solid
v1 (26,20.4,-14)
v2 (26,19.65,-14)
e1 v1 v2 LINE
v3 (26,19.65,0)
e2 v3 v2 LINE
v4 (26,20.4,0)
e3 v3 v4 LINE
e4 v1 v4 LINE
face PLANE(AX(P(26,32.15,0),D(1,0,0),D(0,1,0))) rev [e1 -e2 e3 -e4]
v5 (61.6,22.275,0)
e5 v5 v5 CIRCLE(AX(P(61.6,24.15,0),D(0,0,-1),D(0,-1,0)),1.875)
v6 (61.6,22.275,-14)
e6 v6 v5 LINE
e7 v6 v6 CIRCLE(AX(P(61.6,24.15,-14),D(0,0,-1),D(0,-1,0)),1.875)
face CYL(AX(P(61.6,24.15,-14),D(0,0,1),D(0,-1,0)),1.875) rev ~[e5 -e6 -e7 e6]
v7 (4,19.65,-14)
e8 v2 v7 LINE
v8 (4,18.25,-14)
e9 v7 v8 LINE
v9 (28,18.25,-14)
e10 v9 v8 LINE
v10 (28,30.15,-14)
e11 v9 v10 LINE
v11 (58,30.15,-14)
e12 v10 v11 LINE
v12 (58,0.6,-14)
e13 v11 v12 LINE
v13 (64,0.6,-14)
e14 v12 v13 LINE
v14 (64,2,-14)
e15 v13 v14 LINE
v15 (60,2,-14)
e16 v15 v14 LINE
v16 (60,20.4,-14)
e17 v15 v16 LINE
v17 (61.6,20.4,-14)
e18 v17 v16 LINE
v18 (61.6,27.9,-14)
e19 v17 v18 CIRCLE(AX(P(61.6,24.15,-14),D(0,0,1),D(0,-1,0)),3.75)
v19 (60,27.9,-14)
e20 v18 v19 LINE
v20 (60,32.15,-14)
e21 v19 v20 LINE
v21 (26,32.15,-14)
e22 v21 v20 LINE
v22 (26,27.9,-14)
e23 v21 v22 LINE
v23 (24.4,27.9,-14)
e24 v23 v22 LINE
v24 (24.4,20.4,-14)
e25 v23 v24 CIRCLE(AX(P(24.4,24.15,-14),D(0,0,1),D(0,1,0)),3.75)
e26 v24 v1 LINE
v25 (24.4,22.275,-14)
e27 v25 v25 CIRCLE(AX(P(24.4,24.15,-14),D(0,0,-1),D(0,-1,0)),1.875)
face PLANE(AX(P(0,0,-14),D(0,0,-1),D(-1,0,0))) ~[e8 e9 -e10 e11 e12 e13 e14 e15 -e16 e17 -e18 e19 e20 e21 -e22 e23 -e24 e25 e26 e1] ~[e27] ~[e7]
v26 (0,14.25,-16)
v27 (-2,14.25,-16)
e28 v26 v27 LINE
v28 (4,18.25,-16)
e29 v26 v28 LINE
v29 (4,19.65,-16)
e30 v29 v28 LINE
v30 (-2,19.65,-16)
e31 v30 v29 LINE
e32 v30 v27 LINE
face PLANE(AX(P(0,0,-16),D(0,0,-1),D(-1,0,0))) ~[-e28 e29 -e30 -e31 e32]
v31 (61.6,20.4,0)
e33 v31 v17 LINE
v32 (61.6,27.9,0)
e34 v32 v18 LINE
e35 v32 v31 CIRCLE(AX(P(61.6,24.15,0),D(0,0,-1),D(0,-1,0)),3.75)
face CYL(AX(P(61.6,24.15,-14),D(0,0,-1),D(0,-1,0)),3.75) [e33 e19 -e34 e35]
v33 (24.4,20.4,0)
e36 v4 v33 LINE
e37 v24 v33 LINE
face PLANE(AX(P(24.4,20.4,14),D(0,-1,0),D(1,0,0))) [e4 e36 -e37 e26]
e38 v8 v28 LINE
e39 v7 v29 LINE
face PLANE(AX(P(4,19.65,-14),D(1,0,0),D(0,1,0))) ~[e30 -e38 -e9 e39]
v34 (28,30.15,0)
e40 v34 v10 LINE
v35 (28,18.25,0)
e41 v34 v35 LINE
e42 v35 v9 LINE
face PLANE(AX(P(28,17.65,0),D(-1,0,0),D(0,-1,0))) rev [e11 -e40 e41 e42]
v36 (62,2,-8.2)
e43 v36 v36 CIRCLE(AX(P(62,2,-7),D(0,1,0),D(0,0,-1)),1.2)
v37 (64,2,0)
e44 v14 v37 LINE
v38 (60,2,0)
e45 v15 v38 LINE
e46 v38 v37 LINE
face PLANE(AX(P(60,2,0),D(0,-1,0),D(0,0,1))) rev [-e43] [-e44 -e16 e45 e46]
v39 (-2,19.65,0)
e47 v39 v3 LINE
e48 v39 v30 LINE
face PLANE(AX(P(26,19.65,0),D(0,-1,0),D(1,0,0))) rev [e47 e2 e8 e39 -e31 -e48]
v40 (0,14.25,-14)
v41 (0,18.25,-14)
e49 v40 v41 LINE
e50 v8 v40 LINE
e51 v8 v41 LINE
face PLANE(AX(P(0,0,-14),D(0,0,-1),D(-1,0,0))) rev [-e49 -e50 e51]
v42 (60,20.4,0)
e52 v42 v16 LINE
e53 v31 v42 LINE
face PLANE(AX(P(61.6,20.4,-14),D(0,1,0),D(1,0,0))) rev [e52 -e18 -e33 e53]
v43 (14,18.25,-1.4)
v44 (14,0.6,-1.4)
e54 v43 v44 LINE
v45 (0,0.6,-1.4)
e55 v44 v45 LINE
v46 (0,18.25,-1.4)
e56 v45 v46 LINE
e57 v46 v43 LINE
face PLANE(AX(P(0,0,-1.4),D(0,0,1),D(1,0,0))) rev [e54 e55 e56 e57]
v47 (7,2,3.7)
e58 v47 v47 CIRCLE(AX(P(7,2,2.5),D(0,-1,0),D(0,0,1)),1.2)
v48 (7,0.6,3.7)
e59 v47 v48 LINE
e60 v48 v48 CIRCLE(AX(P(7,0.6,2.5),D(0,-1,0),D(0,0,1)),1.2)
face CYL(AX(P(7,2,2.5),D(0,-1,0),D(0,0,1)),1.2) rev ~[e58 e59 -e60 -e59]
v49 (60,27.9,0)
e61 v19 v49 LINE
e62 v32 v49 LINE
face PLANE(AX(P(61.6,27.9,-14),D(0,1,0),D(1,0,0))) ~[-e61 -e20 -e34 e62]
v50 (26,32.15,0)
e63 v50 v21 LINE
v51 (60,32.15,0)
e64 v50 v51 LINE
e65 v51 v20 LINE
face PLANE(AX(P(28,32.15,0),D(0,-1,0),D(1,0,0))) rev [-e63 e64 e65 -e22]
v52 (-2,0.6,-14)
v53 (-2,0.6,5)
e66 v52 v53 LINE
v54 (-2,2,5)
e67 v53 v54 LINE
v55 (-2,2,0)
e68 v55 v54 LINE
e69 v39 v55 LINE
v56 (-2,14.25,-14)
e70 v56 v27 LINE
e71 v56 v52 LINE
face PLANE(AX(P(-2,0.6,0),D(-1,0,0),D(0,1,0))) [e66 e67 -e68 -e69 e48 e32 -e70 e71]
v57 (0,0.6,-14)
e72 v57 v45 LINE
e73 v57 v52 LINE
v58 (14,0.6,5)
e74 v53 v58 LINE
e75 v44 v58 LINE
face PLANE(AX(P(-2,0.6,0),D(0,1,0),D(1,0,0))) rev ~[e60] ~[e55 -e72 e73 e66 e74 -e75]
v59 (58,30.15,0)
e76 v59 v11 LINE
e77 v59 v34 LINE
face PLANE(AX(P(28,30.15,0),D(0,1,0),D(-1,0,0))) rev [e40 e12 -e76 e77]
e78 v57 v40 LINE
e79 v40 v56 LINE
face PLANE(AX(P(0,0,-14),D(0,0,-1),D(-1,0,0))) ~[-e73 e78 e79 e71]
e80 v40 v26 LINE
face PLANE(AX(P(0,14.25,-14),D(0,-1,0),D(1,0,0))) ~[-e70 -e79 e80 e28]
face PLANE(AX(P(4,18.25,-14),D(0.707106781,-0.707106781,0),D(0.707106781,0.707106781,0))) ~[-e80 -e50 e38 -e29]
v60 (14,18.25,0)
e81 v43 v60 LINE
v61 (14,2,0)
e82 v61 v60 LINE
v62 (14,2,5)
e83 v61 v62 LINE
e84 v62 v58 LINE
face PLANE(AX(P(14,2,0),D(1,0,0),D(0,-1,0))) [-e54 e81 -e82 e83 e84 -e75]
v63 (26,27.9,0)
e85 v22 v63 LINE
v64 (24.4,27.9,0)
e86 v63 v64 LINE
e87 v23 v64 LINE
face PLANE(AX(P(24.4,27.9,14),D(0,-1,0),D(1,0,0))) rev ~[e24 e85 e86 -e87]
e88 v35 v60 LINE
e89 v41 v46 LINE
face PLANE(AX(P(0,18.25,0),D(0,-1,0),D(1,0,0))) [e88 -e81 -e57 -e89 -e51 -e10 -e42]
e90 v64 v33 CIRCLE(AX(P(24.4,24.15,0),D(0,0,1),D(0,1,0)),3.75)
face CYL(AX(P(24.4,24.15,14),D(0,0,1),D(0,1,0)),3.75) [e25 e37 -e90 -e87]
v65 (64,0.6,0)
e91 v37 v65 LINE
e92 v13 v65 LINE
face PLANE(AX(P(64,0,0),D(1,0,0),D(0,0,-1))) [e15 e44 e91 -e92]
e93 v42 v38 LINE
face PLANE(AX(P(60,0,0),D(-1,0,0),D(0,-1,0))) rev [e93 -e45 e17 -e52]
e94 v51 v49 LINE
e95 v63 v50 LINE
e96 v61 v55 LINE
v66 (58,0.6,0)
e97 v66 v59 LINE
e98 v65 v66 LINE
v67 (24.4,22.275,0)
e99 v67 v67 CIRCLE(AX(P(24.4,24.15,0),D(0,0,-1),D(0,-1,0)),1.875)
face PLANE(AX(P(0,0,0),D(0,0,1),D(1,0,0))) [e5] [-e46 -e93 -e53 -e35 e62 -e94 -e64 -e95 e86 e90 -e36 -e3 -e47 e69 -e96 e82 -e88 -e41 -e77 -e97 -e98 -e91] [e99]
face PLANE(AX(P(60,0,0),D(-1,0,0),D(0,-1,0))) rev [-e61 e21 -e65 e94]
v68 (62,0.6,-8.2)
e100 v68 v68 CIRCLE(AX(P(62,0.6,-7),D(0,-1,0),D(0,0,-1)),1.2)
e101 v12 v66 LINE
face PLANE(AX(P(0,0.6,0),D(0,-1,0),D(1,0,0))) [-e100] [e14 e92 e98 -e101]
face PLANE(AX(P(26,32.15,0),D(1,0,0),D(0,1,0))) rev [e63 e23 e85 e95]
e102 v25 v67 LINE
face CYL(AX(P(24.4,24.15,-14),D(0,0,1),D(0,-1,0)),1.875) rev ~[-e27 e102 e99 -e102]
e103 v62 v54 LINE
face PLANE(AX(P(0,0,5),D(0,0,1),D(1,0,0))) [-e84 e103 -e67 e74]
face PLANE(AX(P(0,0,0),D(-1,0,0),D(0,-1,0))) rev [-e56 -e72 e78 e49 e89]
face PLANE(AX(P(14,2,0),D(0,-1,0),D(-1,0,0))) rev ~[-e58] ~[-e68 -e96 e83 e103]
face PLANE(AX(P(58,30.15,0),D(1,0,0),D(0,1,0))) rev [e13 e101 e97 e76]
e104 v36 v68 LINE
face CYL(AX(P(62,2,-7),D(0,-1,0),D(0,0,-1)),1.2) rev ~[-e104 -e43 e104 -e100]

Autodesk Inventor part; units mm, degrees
ref_plane "YZ Plane" through (0, 0, 0) normal (1, 0, 0) x (0, 1, 0)
ref_plane "XZ Plane" through (0, 0, 0) normal (0, 1, 0) x (-1, 0, 0)
ref_plane "XY Plane" through (0, 0, 0) normal (0, 0, 1) x (1, 0, 0)
sketch "スケッチ1" plane through (0, 0, 0) normal (0, 0, 1) x (1, 0, 0)
  line L0 (0, 0) -> (0, 17.65)
  line L1 (0, 17.65) -> (28, 17.65)
  line L2 (28, 17.65) -> (28, 30.15)
  line L3 (28, 30.15) -> (58, 30.15)
  line L4 (58, 30.15) -> (58, 0)
  line L5 (58, 0) -> (60, 0)
  line L6 (60, 0) -> (60, 32.15)
  line L7 (60, 32.15) -> (28, 32.15)
  line L8 (28, 32.15) -> (26, 32.15)
  line L9 (26, 32.15) -> (26, 19.65)
  line L10 (26, 19.65) -> (-2, 19.65)
  line L11 (-2, 19.65) -> (-2, 0)
  line L12 (-2, 0) -> (0, 0)
  dimension "d0" = 17.65
  dimension "d1" = 28
  dimension "d2" = 12.5
  dimension "d3" = 30
  dimension "d4" = 2
  dimension "d5" = 32.15
  dimension "d6" = 32
  dimension "d7" = 2
  dimension "d8" = 12.5
  dimension "d9" = 28
extrude "押し出し1" add sketch "スケッチ1" along normal blind 14
sketch "スケッチ2" plane through (60, 0, 0) normal (1, 0, 0) x (0, 0, -1)
  line L0 (0, 0) -> (-14, 0) projected
  line L1 (-14, 0) -> (0, 0)
  line L2 (0, 0) -> (0, 2)
  line L3 (0, 2) -> (-14, 2)
  line L4 (-14, 2) -> (-14, 0)
  dimension "d12" = 14
  dimension "d13" = 2
extrude "押し出し2" add sketch "スケッチ2" along normal blind 7
sketch "スケッチ3" plane through (-2, 0, 0) normal (-1, 0, 0) x (0, 0, 1)
  line L0 (14, 2) -> (0, 2) projected
  line L1 (0, 0) -> (14, 0)
  line L2 (14, 0) -> (14, 2)
  line L3 (14, 2) -> (0, 2)
  line L4 (0, 2) -> (0, 0)
  dimension "d16" = 14
extrude "押し出し3" add sketch "スケッチ3" along normal blind 7
sketch "スケッチ4" plane through (0, 0, 14) normal (0, 0, 1) x (1, 0, 0)
  line L0 (60, 32.15) -> (60, 24.15)
  line L1 (60, 24.15) -> (61.6, 24.15)
  arc A0 (61.6, 20.4) -> (61.6, 27.9) centre (61.6, 24.15) ccw
  line L2 (61.6, 24.15) -> (61.6, 20.4) construction
  line L3 (61.6, 24.15) -> (61.6, 27.9) construction
  line L4 (61.6, 27.9) -> (60, 27.9)
  line L5 (61.6, 20.4) -> (60, 20.4)
  line L6 (60, 2) -> (60, 32.15) projected
  line L7 (60, 27.9) -> (60, 20.4)
  point P0 (0, 0)
  dimension "d47" = 8
  dimension "d48" = 1.6
  dimension "d49" = 3.75
  dimension "d50" = 180
extrude "押し出し4" add sketch "スケッチ4" against normal blind 14
hole "穴3" at (61.6, 24.15, 14) direction (0, 0, -1) diameter 3.75 end through all
sketch "スケッチ7" plane through (0, 0, 14) normal (0, 0, 1) x (1, 0, 0)
  line L0 (60, 32.15) -> (26, 32.15) projected
  line L1 (26, 32.15) -> (26, 24.15)
  line L2 (26, 24.15) -> (24.4, 24.15)
  arc A0 (24.4, 27.9) -> (24.4, 20.4) centre (24.4, 24.15) ccw
  line L3 (24.4, 27.9) -> (26, 27.9)
  line L4 (24.4, 20.4) -> (26, 20.4)
  line L5 (26, 20.4) -> (26, 27.9)
  line L6 (26, 32.15) -> (26, 19.65) projected
  circle A1 centre (24.4, 24.15) radius 1.875
  point P0 (0, 0)
  dimension "d60" = 8
  dimension "d61" = 1.6
  dimension "d62" = 3.75
  dimension "d63" = 3.75
extrude "押し出し6" add sketch "スケッチ7" against normal blind 14 contours L1 A1 L5 L4 A0 L3 | L1 L5 A1 picked at (23.6929, 24.15)
hole "穴4" at (24.4, 24.15, 14) direction (0, 0, -1) diameter 3.75 end through all
sketch "スケッチ10" plane through (0, 17.65, 0) normal (0, -1, 0) x (1, 0, 0)
  line L0 (28, 14) -> (58, 14) projected
  line L1 (0, 0) -> (28, 0)
  line L2 (28, 0) -> (28, 14)
  line L3 (28, 14) -> (0, 14)
  line L4 (0, 14) -> (0, 0)
extrude "押し出し7" cut sketch "スケッチ10" against normal blind 0.6
sketch "スケッチ11" plane through (0, 0, 0) normal (0, -1, 0) x (1, 0, 0)
  line L0 (0, 14) -> (-9, 14) projected
  line L1 (60, 0) -> (67, 0) projected
  line L2 (-9, 14) -> (67, 14)
  line L3 (67, 14) -> (67, 0)
  line L4 (67, 0) -> (-9, 0)
  line L5 (-9, 0) -> (-9, 14)
  point P0 (0, 0)
extrude "押し出し8" cut sketch "スケッチ11" against normal blind 0.6
sketch "スケッチ12" plane through (0, 0, 14) normal (0, 0, 1) x (1, 0, 0)
  line L0 (-2, 19.65) -> (-2, 2) projected
  line L1 (-2, 19.65) -> (4, 19.65)
  line L2 (26, 19.65) -> (-2, 19.65) projected
  line L3 (4, 19.65) -> (4, 18.25)
  line L4 (0, 18.25) -> (28, 18.25) projected
  line L5 (4, 18.25) -> (0.2844, 14.5344)
  line L6 (4, 18.25) -> (9.2547, 18.25) construction
  line L7 (0.2844, 14.5344) -> (0, 14.25)
  line L8 (0, 0.6) -> (0, 18.25) projected
  line L9 (0, 14.25) -> (-2, 14.25)
  line L10 (-2, 14.25) -> (-2, 19.65)
  point P0 (0, 0)
  dimension "d79" = 6
  dimension "d80" = 135
extrude "押し出し9" add sketch "スケッチ12" along normal blind 2
sketch "スケッチ15" plane through (0, 0, 0) normal (0, 0, -1) x (-1, 0, 0)
  line L0 (0, 0.6) -> (0, 18.25) projected
  line L1 (0, 18.25) -> (-14, 18.25)
  line L2 (-14, 18.25) -> (-14, 0.6)
  line L3 (-14, 0.6) -> (0, 0.6)
  line L4 (0, 0.6) -> (0, 18.25)
  point P0 (0, 0)
  dimension "d88" = 14
extrude "押し出し11" add sketch "スケッチ15" against normal blind 1.4
sketch "スケッチ17" plane through (67, 0, 0) normal (1, 0, 0) x (0, 0, -1)
  line L0 (0, 0.6) -> (-14, 0.6) projected
  line L1 (0, 0.6) -> (-14, 0.6)
  line L2 (-14, 0.6) -> (-14, 9.5309)
  line L3 (-14, 9.5309) -> (0, 9.5309)
  line L4 (0, 9.5309) -> (0, 0.6)
  point P0 (0, 0)
extrude "押し出し13" cut sketch "スケッチ17" against normal blind 3
sketch "スケッチ18" plane through (-9, 0, 0) normal (-1, 0, 0) x (0, 0, 1)
  line L0 (0, 0.6) -> (14, 0.6) projected
  line L1 (0, 0.6) -> (14, 0.6)
  line L2 (14, 0.6) -> (14, 6.5)
  line L3 (14, 6.5) -> (0, 6.5)
  line L4 (0, 6.5) -> (0, 0.6)
  point P0 (0, 0)
extrude "押し出し14" cut sketch "スケッチ18" against normal blind 3
hole "穴5" at (-4, 2, 7) direction (0, -1, 0) diameter 2.4 end through all
hole "穴6" at (62, 2, 7) direction (0, -1, 0) diameter 2.4 end through all
mirror "ミラー1" about plane through (31.8158, 20.0509, 0) normal (0, 0, -1) of "押し出し3", "押し出し1", "押し出し4", "穴3", "押し出し2", "穴6", "穴4", "押し出し6", "押し出し7", "押し出し9", "押し出し11", "押し出し14", "押し出し13", "穴5", "押し出し8"
sketch "スケッチ19" plane through (0, 0, 14) normal (0, 0, 1) x (1, 0, 0)
  line L0 (94.8832, 81.412) -> (-62.365, 81.412)
  line L1 (-62.365, 81.412) -> (-62.365, -71.7744)
  line L2 (-62.365, -71.7744) -> (94.8832, -71.7744)
  line L3 (94.8832, -71.7744) -> (94.8832, 81.412)
  point P0 (0, 0)
extrude "押し出し15" cut sketch "スケッチ19" against normal blind 14
sketch "スケッチ20" plane through (-2, 19.65, 14) normal (0, 1, 0) x (1, 0, 0)
  line L0 (17.6833, -4.2941) -> (-12.6138, -4.2941)
  line L1 (-12.6138, -4.2941) -> (-12.6138, 1.0873)
  line L2 (-12.6138, 1.0873) -> (17.6833, 1.0873)
  line L3 (17.6833, 1.0873) -> (17.6833, -4.2941)
  point P0 (2, 14)
extrude "押し出し16" cut sketch "スケッチ20" against normal blind 14
sketch "スケッチ21" plane through (-6, 2, -14) normal (0, 1, 0) x (1, 0, 0)
  line L0 (4, 0) -> (4, -14) projected
  line L1 (0, 0) -> (4, 0)
  line L2 (4, 0) -> (4, -14)
  line L3 (4, -14) -> (0, -14)
  line L4 (0, -14) -> (0, 0)
  point P0 (6, -14)
extrude "押し出し17" cut sketch "スケッチ21" against normal blind 14
sketch "スケッチ22" plane through (0, 0, 0) normal (0, 0, 1) x (1, 0, 0)
  line L0 (-2, 0.6) -> (-2, 14.25) projected
  line L1 (14, 18.25) -> (14, 0.6) projected
  line L2 (-2, 0.6) -> (14, 0.6)
  line L3 (14, 0.6) -> (14, 2)
  line L4 (14, 2) -> (-2, 2)
  line L5 (-2, 2) -> (-2, 0.6)
  point P0 (0, 0)
  dimension "d121" = 1.4
extrude "押し出し18" add sketch "スケッチ22" along normal blind 5
hole "穴7" at (7, 2, 2.5) direction (0, -1, 0) diameter 2.4 end through all
properties part number "センサ冶具"
